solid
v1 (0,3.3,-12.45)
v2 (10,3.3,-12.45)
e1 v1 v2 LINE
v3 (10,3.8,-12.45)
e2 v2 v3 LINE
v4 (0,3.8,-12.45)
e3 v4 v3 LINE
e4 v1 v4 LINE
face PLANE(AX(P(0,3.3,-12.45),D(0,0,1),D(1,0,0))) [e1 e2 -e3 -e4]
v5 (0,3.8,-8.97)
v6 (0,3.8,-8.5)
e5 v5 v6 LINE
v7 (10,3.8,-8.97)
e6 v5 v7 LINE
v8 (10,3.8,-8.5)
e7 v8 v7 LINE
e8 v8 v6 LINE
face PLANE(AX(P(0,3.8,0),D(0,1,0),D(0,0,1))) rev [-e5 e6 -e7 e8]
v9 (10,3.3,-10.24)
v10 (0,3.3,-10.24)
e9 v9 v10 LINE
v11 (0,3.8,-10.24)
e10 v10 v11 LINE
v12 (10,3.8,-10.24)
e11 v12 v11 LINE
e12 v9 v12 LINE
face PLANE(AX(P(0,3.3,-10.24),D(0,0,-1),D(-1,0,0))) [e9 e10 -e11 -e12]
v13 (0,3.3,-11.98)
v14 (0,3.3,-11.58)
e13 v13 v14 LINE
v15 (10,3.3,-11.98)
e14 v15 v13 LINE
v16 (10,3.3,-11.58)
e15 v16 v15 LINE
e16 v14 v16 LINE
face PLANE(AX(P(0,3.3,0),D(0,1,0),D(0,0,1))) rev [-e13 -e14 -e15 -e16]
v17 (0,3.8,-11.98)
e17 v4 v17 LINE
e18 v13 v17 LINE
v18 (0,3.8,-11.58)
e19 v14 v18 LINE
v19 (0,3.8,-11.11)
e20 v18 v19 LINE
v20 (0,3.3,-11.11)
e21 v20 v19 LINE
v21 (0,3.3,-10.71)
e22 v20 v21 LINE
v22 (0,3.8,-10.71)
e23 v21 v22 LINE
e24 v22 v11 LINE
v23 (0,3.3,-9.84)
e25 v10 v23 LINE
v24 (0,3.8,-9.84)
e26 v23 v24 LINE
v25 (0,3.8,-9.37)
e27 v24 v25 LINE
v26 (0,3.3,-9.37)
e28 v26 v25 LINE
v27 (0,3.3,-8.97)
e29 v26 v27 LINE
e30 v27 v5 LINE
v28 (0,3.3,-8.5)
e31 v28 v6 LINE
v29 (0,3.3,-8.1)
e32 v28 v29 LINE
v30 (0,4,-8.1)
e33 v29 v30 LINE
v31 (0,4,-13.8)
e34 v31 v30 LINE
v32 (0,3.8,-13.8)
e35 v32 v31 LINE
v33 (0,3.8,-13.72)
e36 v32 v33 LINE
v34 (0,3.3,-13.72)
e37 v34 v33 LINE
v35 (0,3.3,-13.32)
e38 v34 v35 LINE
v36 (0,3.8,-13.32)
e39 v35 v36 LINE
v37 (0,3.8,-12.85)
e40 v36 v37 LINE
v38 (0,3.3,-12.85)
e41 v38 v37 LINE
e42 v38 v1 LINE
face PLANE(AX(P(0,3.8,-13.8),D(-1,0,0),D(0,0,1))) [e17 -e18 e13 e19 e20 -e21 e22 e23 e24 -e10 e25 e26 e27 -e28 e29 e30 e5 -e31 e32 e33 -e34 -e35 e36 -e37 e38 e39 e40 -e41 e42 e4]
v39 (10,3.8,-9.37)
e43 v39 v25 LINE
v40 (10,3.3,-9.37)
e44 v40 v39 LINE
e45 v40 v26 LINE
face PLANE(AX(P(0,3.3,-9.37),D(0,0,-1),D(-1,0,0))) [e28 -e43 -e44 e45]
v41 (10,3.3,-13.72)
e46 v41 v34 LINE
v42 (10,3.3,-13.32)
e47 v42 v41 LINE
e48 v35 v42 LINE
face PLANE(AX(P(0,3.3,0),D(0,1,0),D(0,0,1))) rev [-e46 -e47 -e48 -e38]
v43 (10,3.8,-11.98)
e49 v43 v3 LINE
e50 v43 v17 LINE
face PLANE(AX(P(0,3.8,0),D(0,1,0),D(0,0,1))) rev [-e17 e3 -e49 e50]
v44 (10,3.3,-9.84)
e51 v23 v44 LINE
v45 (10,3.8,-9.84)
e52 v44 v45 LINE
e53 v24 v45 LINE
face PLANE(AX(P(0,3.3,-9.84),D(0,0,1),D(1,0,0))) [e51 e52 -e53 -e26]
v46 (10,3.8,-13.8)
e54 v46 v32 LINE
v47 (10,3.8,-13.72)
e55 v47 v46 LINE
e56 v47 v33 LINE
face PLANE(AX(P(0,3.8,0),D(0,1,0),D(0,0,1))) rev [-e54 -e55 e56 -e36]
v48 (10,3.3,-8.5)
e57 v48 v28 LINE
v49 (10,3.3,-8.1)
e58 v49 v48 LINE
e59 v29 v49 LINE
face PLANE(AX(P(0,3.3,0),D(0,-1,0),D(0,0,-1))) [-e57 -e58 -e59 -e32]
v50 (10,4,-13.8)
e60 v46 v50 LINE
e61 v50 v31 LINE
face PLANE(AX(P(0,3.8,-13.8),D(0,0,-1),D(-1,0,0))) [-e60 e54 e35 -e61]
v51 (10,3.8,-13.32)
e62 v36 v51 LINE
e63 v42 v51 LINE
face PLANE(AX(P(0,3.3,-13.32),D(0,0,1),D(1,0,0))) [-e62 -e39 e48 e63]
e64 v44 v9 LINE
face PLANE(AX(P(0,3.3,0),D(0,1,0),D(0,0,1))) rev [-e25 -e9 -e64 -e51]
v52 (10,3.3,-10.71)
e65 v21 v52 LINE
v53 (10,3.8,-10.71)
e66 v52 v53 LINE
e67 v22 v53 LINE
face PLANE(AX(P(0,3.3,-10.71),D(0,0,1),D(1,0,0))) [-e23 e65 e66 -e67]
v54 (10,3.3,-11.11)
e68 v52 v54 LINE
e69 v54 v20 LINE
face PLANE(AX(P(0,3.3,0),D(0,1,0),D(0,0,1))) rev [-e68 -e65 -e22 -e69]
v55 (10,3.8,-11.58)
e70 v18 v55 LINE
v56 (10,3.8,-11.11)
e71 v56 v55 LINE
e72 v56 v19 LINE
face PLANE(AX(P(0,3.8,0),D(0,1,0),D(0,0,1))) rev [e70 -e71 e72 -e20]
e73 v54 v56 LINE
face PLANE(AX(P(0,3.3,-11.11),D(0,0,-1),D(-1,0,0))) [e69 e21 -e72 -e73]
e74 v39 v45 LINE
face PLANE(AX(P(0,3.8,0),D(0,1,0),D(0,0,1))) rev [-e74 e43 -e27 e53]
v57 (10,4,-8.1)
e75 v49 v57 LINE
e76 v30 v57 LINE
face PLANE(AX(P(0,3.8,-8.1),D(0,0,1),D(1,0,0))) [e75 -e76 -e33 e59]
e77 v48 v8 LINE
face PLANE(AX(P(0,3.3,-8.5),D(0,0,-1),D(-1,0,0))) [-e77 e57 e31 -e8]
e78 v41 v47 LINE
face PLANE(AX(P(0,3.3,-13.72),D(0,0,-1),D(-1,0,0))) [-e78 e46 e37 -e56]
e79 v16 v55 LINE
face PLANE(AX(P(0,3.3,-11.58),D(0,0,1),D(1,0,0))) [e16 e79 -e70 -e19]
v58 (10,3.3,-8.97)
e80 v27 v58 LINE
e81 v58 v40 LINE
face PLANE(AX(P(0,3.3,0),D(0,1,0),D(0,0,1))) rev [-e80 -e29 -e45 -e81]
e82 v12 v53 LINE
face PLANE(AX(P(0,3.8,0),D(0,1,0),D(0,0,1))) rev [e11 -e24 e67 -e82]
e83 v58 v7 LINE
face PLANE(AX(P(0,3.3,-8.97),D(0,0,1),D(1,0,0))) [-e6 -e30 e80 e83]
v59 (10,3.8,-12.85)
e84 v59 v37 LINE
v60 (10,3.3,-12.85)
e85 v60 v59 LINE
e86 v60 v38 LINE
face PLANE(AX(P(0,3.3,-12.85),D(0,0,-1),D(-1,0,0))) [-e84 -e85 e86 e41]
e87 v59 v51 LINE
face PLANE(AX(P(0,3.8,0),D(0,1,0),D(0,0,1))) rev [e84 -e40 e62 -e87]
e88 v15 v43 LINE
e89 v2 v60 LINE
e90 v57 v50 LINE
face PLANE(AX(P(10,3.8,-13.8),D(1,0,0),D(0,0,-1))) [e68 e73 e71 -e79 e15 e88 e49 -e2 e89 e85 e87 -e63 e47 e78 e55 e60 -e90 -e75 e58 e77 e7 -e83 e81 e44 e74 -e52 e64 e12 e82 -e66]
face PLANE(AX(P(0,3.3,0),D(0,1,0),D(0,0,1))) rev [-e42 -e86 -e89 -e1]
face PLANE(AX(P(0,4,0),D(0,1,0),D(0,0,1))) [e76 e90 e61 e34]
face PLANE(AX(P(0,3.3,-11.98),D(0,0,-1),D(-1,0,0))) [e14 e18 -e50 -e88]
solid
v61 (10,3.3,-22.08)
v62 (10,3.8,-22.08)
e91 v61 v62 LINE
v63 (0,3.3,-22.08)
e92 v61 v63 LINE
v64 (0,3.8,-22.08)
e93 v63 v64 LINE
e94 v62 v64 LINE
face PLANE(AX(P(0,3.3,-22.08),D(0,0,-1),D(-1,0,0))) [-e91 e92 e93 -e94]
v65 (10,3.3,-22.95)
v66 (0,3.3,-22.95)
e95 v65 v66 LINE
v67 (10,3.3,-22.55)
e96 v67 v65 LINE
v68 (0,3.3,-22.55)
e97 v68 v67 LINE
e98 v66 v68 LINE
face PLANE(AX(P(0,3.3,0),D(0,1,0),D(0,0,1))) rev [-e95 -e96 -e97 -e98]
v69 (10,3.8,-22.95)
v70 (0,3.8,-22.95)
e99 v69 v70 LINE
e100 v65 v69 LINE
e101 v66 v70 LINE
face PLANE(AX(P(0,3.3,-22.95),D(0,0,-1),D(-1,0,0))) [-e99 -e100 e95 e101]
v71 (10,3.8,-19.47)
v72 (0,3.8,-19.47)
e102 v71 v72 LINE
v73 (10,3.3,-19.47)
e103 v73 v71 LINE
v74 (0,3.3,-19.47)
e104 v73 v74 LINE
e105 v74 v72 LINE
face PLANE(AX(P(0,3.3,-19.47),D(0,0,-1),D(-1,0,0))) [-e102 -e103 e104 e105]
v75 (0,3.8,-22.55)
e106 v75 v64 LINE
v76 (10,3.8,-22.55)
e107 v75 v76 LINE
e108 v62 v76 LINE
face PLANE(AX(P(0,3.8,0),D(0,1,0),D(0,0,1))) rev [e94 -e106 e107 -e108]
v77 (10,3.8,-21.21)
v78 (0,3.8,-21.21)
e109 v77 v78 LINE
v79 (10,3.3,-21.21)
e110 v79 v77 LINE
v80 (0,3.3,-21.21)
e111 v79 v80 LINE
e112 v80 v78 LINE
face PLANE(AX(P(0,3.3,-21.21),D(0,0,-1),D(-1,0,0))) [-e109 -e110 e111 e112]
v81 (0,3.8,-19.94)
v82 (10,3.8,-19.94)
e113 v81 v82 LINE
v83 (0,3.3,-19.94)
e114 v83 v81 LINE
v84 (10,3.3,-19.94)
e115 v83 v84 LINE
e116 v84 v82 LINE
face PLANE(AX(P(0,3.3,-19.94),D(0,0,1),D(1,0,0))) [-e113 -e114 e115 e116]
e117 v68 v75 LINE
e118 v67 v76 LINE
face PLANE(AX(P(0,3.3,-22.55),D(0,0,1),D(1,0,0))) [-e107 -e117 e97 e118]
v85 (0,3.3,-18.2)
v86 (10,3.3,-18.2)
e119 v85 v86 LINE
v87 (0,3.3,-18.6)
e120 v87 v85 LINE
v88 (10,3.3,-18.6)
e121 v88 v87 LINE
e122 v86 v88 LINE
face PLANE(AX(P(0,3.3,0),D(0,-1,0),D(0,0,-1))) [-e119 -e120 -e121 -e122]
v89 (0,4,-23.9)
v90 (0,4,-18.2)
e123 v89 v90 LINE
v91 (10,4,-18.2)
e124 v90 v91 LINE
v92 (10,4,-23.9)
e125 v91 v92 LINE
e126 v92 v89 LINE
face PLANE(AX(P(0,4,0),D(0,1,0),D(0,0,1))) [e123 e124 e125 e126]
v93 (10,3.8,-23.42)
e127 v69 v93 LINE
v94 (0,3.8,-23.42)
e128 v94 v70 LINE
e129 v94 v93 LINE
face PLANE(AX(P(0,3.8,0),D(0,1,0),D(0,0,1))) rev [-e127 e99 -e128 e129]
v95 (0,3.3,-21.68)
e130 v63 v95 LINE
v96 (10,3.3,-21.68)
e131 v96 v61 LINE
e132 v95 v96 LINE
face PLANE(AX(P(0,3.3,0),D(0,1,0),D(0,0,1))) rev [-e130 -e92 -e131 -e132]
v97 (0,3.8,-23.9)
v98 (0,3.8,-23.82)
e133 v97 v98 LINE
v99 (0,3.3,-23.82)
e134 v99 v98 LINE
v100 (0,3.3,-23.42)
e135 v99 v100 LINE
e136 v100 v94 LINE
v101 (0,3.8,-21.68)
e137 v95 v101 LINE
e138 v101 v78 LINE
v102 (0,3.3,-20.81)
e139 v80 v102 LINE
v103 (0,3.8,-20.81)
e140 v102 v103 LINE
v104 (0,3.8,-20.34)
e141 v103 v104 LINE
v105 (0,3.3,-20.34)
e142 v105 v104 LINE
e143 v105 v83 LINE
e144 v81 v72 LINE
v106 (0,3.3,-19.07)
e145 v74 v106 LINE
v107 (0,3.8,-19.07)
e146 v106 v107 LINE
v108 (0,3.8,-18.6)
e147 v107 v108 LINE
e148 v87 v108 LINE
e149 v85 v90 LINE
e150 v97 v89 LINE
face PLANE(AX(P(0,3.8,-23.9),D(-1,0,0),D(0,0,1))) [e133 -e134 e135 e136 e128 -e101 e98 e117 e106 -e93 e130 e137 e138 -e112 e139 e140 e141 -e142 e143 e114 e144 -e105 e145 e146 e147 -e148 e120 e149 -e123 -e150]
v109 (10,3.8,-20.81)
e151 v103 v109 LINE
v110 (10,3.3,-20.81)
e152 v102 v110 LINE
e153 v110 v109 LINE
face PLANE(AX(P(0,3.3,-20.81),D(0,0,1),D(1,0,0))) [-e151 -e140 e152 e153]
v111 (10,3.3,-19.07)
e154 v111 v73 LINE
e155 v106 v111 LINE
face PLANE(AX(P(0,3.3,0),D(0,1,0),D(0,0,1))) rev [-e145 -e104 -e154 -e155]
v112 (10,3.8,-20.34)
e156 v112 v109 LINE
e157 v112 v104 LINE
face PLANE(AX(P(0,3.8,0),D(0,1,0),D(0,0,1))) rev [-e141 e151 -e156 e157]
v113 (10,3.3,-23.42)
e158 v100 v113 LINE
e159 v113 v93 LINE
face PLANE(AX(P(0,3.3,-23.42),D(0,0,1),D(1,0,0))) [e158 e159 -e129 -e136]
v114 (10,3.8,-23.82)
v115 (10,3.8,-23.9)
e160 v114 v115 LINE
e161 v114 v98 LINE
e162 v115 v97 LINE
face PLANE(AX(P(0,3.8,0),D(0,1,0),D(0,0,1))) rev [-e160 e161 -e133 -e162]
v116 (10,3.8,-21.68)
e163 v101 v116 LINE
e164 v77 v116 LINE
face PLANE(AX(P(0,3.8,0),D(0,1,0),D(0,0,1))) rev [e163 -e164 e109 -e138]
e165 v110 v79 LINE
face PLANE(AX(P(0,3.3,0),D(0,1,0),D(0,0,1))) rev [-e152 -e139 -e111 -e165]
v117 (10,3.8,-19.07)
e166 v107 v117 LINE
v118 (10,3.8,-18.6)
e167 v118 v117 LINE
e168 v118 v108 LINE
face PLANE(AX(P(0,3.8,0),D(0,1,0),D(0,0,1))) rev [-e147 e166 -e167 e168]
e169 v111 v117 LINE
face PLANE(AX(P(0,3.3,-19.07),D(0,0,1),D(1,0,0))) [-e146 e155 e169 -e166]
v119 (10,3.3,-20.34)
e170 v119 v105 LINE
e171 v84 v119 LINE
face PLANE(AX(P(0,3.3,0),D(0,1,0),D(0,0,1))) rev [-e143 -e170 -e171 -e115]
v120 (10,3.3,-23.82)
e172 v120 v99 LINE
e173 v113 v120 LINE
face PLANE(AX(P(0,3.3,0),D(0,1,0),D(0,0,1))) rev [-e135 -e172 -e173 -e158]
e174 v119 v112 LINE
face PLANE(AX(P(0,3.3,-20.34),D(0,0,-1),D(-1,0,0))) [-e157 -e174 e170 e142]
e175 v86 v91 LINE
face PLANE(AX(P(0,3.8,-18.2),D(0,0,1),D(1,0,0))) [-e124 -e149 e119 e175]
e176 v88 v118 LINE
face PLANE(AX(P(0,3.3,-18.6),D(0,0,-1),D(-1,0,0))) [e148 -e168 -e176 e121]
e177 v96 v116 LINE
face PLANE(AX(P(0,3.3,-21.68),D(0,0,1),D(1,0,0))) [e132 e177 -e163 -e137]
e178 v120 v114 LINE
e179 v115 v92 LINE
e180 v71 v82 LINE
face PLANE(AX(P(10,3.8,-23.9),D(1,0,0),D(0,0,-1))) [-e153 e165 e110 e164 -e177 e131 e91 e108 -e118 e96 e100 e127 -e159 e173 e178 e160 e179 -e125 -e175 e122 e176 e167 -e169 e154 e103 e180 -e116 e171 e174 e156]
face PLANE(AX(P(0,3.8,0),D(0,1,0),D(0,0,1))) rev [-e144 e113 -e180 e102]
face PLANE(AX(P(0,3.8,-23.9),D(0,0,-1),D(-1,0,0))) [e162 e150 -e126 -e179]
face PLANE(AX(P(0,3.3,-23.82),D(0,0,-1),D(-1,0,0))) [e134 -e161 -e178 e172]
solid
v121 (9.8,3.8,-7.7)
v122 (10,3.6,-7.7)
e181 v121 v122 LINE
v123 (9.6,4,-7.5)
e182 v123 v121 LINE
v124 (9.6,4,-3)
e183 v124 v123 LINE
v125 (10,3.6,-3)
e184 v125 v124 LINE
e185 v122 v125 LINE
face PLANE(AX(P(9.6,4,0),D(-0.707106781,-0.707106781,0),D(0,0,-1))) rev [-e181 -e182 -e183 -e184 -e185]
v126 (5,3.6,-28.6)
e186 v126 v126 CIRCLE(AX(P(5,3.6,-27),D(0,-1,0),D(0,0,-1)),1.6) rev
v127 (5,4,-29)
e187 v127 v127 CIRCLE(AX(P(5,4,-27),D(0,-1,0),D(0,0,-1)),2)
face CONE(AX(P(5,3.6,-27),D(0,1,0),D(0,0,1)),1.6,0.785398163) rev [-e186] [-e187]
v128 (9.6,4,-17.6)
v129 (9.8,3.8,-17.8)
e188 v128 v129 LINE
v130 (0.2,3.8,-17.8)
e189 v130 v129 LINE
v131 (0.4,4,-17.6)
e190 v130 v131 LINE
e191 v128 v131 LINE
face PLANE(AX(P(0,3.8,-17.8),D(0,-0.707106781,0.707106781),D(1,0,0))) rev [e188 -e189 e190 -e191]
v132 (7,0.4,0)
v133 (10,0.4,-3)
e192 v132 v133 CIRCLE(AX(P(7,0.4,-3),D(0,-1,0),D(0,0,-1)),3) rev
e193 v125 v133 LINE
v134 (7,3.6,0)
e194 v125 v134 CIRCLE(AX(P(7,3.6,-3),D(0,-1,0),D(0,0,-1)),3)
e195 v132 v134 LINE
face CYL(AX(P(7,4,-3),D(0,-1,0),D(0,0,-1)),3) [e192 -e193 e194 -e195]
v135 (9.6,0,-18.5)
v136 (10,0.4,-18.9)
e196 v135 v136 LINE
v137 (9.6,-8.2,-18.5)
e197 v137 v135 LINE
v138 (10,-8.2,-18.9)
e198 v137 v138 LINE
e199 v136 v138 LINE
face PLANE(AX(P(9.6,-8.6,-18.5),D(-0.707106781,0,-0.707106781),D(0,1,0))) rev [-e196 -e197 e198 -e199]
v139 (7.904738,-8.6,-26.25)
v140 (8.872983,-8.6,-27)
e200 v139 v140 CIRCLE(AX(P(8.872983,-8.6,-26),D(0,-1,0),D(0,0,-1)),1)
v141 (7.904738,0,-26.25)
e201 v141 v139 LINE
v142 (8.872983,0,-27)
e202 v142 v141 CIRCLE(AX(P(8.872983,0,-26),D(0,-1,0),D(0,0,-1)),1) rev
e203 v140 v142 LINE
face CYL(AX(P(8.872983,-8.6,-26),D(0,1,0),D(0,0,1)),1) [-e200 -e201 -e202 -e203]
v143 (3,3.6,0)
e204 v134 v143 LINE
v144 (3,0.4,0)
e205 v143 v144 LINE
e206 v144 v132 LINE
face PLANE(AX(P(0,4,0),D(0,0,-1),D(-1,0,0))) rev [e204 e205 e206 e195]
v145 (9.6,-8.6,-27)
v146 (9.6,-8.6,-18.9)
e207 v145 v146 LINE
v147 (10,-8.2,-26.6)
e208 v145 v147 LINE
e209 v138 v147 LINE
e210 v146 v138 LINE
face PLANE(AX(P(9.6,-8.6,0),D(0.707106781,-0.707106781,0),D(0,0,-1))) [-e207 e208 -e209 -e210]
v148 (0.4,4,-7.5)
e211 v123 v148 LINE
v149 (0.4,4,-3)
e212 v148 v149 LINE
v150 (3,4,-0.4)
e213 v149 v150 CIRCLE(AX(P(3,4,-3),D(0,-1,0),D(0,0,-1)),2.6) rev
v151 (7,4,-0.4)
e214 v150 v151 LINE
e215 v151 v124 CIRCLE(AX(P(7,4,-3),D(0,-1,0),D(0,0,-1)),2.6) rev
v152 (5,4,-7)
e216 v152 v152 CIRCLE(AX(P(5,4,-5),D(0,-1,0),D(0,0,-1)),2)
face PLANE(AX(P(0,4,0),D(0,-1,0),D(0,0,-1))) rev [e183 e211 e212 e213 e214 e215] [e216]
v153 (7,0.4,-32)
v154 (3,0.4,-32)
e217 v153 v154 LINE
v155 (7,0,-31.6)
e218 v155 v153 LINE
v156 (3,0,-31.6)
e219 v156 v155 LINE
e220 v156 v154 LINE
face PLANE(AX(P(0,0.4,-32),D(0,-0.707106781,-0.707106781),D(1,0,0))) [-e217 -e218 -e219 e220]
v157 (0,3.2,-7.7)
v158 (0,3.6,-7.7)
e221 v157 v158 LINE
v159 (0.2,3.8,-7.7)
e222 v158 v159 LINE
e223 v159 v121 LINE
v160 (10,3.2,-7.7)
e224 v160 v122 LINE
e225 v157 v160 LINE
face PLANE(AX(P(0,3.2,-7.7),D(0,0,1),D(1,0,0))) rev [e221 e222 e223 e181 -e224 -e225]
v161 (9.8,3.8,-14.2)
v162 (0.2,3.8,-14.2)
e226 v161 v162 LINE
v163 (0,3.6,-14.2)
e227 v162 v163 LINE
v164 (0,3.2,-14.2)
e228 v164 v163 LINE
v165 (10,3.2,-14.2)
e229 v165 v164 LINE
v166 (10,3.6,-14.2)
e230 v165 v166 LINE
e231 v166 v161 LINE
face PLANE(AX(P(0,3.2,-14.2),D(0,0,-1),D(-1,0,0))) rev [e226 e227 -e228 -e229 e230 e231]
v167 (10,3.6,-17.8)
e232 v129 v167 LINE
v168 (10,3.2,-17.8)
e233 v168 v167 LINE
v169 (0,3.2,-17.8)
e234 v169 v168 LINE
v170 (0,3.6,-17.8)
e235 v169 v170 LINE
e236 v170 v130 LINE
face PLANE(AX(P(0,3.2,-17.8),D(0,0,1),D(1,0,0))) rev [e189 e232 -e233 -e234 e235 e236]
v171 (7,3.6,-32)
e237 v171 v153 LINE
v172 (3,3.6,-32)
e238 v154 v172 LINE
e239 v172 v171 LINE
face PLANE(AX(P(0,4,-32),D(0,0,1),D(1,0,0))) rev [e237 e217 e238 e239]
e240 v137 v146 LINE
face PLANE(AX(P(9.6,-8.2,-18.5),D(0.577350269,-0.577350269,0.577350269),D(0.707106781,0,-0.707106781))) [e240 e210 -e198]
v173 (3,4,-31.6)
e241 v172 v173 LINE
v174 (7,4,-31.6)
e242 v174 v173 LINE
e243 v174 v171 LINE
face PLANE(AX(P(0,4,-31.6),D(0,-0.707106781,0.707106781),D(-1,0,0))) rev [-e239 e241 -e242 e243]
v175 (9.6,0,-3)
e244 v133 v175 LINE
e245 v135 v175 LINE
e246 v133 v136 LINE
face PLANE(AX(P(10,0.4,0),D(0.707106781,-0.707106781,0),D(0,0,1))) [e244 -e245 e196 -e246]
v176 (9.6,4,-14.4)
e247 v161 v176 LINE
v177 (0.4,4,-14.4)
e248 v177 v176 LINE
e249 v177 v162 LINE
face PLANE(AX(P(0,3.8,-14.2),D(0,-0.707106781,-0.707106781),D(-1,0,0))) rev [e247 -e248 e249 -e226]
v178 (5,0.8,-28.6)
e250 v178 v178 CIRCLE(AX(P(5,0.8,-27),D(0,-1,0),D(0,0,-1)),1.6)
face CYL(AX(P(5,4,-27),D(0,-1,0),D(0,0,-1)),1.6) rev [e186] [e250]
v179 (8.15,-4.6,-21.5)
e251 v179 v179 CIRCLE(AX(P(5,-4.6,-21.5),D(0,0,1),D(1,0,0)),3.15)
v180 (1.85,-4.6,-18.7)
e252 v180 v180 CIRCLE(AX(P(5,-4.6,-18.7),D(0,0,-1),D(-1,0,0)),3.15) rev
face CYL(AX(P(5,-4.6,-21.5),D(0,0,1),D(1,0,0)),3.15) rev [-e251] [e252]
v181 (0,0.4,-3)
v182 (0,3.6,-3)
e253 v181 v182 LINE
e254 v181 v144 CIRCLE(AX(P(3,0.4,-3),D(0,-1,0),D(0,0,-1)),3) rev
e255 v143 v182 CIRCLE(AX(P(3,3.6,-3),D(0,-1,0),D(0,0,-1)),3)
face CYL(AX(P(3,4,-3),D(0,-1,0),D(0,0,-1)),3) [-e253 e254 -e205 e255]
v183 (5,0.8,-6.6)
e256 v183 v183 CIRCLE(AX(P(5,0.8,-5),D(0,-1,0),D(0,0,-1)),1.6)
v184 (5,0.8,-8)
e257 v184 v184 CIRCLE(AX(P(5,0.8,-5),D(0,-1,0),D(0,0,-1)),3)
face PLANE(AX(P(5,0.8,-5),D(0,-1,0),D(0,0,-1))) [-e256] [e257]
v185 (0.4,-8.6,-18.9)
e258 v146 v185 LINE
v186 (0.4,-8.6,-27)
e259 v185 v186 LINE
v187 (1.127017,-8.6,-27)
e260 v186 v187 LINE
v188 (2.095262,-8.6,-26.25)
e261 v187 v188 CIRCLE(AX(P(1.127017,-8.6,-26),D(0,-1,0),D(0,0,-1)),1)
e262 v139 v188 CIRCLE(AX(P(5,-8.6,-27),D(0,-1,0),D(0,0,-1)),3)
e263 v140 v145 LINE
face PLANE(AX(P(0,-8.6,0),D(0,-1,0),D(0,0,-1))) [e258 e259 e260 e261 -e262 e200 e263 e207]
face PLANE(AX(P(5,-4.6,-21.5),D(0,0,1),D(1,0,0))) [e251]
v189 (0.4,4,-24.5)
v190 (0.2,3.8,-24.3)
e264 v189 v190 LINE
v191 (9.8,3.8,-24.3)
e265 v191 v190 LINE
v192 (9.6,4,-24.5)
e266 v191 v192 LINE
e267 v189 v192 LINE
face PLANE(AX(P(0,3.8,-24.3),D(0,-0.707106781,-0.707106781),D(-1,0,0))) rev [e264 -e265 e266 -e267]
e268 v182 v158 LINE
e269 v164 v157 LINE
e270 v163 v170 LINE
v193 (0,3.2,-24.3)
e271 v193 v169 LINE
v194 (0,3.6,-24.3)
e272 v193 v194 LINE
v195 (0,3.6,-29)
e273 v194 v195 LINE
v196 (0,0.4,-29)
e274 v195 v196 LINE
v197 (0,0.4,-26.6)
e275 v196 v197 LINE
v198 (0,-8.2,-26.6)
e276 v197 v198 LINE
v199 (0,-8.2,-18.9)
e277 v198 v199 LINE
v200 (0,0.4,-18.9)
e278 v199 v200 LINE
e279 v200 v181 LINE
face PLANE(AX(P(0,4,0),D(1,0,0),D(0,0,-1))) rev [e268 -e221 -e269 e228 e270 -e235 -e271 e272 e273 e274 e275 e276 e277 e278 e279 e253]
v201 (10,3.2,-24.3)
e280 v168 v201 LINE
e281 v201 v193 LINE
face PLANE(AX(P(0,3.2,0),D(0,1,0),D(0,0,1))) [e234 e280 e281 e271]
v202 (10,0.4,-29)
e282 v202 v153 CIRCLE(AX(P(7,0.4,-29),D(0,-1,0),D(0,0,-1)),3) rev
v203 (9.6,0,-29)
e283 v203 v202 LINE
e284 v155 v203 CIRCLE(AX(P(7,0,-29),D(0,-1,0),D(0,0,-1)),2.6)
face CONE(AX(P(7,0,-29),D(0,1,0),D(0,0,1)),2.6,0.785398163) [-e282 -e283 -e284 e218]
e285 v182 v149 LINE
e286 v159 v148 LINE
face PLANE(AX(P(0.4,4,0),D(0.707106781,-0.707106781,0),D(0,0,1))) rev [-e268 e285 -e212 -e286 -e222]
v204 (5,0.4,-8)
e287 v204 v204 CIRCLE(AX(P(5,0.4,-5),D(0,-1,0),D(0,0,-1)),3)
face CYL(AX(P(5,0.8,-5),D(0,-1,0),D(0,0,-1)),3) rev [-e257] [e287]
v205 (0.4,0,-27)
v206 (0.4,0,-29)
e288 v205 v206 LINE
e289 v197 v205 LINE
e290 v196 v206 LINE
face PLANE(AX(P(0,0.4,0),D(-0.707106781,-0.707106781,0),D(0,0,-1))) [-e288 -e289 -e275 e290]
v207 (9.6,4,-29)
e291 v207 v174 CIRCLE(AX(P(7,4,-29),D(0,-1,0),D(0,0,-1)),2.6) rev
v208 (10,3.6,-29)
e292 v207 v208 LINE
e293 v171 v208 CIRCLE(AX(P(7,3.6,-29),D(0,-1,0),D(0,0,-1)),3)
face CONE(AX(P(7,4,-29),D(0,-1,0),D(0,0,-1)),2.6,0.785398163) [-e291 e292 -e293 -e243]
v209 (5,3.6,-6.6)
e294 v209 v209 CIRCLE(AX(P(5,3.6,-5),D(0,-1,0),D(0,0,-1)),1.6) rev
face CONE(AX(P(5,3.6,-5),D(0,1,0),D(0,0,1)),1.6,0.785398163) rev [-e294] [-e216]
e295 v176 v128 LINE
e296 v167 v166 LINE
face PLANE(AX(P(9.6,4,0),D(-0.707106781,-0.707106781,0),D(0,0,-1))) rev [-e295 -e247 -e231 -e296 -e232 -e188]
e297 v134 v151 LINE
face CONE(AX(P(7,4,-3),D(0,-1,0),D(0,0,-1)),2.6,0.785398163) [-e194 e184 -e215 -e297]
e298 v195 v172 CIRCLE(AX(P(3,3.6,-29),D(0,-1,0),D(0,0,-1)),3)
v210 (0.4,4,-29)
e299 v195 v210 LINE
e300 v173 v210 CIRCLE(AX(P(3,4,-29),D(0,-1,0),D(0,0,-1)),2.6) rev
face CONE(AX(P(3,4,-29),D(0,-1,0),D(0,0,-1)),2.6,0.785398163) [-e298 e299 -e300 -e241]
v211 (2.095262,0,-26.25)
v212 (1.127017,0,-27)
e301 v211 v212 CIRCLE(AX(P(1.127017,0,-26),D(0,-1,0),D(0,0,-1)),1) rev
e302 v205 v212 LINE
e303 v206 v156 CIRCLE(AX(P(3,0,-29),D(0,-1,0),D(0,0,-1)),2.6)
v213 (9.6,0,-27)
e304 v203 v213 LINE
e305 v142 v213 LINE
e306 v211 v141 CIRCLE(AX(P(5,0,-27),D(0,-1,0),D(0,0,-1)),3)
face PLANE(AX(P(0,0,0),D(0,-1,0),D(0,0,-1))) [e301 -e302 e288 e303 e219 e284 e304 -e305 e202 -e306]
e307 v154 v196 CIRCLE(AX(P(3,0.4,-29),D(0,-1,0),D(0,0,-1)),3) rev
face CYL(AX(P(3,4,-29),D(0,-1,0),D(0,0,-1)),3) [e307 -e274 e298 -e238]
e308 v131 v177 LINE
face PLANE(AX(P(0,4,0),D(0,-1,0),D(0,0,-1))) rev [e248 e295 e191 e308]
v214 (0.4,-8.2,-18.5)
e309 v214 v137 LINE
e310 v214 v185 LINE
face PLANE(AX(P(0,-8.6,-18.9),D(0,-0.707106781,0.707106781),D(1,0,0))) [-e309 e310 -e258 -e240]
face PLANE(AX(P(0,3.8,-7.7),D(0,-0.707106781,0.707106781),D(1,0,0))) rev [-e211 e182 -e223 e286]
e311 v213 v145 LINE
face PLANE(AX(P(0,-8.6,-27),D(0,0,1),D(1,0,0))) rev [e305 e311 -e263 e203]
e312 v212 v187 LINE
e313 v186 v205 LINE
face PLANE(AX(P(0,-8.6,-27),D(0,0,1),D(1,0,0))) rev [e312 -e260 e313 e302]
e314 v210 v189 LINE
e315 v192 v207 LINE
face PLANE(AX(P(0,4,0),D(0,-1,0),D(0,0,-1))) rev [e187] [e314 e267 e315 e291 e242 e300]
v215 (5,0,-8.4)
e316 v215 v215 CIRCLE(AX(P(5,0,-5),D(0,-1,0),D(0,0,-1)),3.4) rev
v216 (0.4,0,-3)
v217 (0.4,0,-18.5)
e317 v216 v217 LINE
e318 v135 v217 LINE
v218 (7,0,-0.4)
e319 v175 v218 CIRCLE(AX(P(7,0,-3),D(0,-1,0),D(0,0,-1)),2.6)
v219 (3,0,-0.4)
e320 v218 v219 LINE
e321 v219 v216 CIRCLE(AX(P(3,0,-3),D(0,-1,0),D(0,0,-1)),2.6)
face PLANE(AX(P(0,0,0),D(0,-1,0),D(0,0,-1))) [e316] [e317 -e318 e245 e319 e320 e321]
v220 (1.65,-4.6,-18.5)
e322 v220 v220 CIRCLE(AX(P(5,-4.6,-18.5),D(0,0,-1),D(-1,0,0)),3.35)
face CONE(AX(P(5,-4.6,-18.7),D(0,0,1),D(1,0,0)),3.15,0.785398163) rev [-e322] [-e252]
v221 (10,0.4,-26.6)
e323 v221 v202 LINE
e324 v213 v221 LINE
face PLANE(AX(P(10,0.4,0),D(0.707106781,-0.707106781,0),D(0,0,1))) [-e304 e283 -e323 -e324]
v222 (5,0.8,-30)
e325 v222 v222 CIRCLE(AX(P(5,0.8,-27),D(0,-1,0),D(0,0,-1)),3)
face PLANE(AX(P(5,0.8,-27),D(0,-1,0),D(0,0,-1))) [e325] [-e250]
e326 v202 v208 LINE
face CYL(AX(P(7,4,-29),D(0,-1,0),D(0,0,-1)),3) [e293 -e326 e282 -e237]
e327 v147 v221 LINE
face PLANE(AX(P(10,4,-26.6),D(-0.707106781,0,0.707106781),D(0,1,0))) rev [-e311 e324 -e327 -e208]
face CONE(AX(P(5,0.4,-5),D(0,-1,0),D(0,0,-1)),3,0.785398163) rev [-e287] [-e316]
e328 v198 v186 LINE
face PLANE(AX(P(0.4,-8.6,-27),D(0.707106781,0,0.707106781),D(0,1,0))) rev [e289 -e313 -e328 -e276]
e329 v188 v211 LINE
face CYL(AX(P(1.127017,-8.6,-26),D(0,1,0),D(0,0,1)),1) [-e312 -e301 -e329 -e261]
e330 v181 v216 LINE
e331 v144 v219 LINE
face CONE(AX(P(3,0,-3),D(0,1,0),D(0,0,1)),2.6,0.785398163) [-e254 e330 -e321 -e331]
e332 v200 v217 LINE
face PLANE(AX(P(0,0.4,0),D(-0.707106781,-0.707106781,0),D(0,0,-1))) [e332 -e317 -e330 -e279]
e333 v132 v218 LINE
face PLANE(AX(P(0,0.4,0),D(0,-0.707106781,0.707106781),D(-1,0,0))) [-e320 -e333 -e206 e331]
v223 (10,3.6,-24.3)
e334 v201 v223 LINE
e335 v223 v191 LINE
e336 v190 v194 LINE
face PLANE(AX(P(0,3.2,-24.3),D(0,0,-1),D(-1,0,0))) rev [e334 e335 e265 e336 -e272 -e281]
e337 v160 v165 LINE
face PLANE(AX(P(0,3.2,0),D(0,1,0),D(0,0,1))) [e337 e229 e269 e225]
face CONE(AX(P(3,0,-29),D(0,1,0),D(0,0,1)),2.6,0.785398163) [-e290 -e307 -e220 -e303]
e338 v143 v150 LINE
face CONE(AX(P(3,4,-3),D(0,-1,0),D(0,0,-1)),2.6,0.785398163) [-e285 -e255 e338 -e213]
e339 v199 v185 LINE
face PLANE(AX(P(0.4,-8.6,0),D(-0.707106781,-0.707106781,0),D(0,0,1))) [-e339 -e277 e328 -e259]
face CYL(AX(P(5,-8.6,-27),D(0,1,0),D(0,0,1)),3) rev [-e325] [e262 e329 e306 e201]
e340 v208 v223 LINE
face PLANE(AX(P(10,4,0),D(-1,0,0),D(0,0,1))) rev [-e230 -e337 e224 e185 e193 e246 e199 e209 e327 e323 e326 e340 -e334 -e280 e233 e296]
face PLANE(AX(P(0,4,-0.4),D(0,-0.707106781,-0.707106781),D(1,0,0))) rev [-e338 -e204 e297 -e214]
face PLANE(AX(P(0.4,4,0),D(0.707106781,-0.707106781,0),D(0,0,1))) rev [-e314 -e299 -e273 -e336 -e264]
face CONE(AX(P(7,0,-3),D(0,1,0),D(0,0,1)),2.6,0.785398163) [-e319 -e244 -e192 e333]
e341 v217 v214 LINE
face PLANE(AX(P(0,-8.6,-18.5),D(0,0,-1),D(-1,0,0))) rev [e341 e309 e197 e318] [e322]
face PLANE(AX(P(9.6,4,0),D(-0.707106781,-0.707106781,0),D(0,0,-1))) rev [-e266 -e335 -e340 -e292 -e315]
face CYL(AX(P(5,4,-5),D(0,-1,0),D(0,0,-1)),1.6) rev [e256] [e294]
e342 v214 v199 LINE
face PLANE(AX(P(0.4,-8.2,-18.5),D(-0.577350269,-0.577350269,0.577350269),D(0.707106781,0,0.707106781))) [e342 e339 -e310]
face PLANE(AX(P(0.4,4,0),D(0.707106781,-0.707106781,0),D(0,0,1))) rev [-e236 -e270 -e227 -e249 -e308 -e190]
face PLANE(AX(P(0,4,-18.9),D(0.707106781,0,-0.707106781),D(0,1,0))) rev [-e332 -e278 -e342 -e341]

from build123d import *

# Parameters (mm, degrees)
SKETCH_1_W          = 10
SKETCH_1_H          = 32
SKETCH_1_R          = 1.6
EXTRUDE_1_DEPTH     = 4
SKETCH_2_W          = 10
SKETCH_2_H          = 8.5
EXTRUDE_2_DEPTH     = 8.6
SKETCH_3_R          = 3.15
CUT_EXTRUDE_1_DEPTH = 3
SKETCH_4_R          = 3
CUT_EXTRUDE_2_DEPTH = 35.611558763
SKETCH_5_W          = 10
SKETCH_5_H          = 6.5
CUT_EXTRUDE_3_DEPTH = 0.8
SKETCH_6_W          = 10
SKETCH_6_H          = 5.7
EXTRUDE_3_DEPTH     = 0.2
EXTRUDE_3_2_DEPTH   = 0.2
SKETCH_7_W          = 10
SKETCH_7_H          = 0.4
EXTRUDE_4_DEPTH     = 0.7
CUT_EXTRUDE_START   = -0.8
SKETCH_8_R          = 3
CUT_EXTRUDE_4_DEPTH = 0.8
FILLET_1_R          = 3
FILLET_3_R          = 1
CHAMFER_1_SIZE      = 0.2
CHAMFER_4_SIZE      = 0.4
CHAMFER_6_SIZE      = 0.2


with BuildPart() as part:
    # 草图1 → 凸台-拉伸1 (new body)
    with BuildSketch(Plane(origin=(0, 0, 0), x_dir=(1, 0, 0), z_dir=(0, 1, 0))):
        with Locations((5, 16)):
            Rectangle(SKETCH_1_W, SKETCH_1_H)
        with Locations(Location((5, 27, 0), (0, 0, 270))):
            Circle(SKETCH_1_R, mode=Mode.SUBTRACT)
        with Locations(Location((5, 5, 0), (0, 0, 270))):
            Circle(SKETCH_1_R, mode=Mode.SUBTRACT)
    extrude(amount=EXTRUDE_1_DEPTH)

    # 草图2 → 凸台-拉伸2 (add)
    with BuildSketch(Plane(origin=(0, 0, 0), x_dir=(-1, 0, 0), z_dir=(0, -1, 0))):
        with Locations((-5, 22.75)):
            Rectangle(SKETCH_2_W, SKETCH_2_H)
    extrude(amount=EXTRUDE_2_DEPTH)

    # 草图3 → 切除-拉伸1 (cut)
    with BuildSketch(Plane.XY.offset(-18.5)):
        with Locations((5, -4.6)):
            Circle(SKETCH_3_R)
    extrude(amount=-CUT_EXTRUDE_1_DEPTH, mode=Mode.SUBTRACT)

    # 草图4 → 切除-拉伸2 (cut, through all)
    with BuildSketch(Plane(origin=(0, 0, 0), x_dir=(-1, 0, 0), z_dir=(0, -1, 0))):
        with Locations((-5, 27)):
            Circle(SKETCH_4_R)
    extrude(amount=CUT_EXTRUDE_2_DEPTH, mode=Mode.SUBTRACT)

    # 草图5 → 切除-拉伸3 (cut)
    with BuildSketch(Plane(origin=(0, 4, 0), x_dir=(1, 0, 0), z_dir=(0, 1, 0))):
        with Locations((5, 21.05)):
            Rectangle(SKETCH_5_W, SKETCH_5_H)
        with Locations((5, 10.95)):
            Rectangle(SKETCH_5_W, SKETCH_5_H)
    extrude(amount=-CUT_EXTRUDE_3_DEPTH, mode=Mode.SUBTRACT)

    # 草图8 → 切除-拉伸4 (cut)
    with BuildSketch(Plane(origin=(0, 0, 0), x_dir=(-1, 0, 0), z_dir=(0, -1, 0)).offset(CUT_EXTRUDE_START)):
        with Locations(Location((-5, 5, 0), (0, 0, 90))):
            Circle(SKETCH_8_R)
        with Locations((-5, 27)):
            Circle(SKETCH_8_R)
    extrude(amount=CUT_EXTRUDE_4_DEPTH, mode=Mode.SUBTRACT)

    # 圆角1
    fillet_1_edges = [part.edges().sort_by_distance(p)[0] for p in [
        (0, 2, -32),
        (10, 2, -32),
        (10, 2, 0),
        (0, 2, 0),
    ]]
    fillet(fillet_1_edges, radius=FILLET_1_R)

    # 圆角3
    # the kernel refuses this fillet: 1 mm, written as the material it takes off along each edge
    with BuildSketch(Plane(origin=(8, -10.782458366, -27), x_dir=(1, 0, 0), z_dir=(0, 1, 0)), Plane(origin=(2, 0, -27), x_dir=(-1, 0, 0), z_dir=(0, -1, 0))) as fillet_3_piece_1:
        with BuildLine():
            CenterArc((0.872983346, -1), FILLET_3_R, 90, 75.522487814)
            ThreePointArc((-0.09526249, -0.75), (-0.023910911, -0.378012877), (0, 0))
            Line((0, 0), (0.872983346, 0))
        make_face()
    extrude(amount=10.782458366, mode=Mode.SUBTRACT)

    # 倒角1
    chamfer_1_edges = [part.edges().sort_by_distance(p)[0] for p in [
        (5, 4, -17.8),
        (5, 4, -24.3),
        (5, 4, -7.7),
        (5, 4, -14.2),
    ]]
    chamfer(chamfer_1_edges, length=CHAMFER_1_SIZE)

    # 倒角4
    chamfer_4_edges = [part.edges().sort_by_distance(p)[0] for p in [
        (10, 4, -26.75),
        (0, 4, -26.75),
        (10, 4, -16),
        (0, 4, -16),
        (5, 4, -6.6),
        (0, 4, -5.25),
        (10, 4, -5.25),
        (0.878679656, 4, -0.878679656),
        (9.121320344, 4, -0.878679656),
        (5, 4, 0),
        (5, 4, -28.6),
        (5, 0, -2),
        (10, 0, -10.75),
        (9.121320344, 0, -0.878679656),
        (5, 0, 0),
        (0.878679656, 0, -0.878679656),
        (10, -4.3, -27),
        (0, 0, -10.75),
        (10, -4.3, -18.5),
        (10, -8.6, -22.75),
        (5, -8.6, -18.5),
        (0, -4.3, -18.5),
        (0, -8.6, -22.75),
        (0, -4.3, -27),
        (0, 0, -28),
        (10, 0, -28),
        (5, 0, -32),
        (5, 4, -32),
        (9.121320344, 0, -31.121320344),
        (0.878679656, 0, -31.121320344),
        (9.121320344, 4, -31.121320344),
        (0.878679656, 4, -31.121320344),
    ]]
    chamfer(chamfer_4_edges, length=CHAMFER_4_SIZE)

    # 倒角6
    chamfer_6_edges = [part.edges().sort_by_distance(p)[0] for p in [
        (1.85, -4.6, -18.5),
    ]]
    chamfer(chamfer_6_edges, length=CHAMFER_6_SIZE)


with BuildPart() as body_2:
    # 草图6 → 凸台-拉伸3 (new body)
    with BuildSketch(Plane(origin=(0, 4, 0), x_dir=(1, 0, 0), z_dir=(0, 1, 0))):
        with Locations((5, 10.95)):
            Rectangle(SKETCH_6_W, SKETCH_6_H)
    extrude(amount=-EXTRUDE_3_DEPTH)



with BuildPart() as body_3:
    # 草图6 → Extrude 3 2 (new body)
    with BuildSketch(Plane(origin=(0, 4, 0), x_dir=(1, 0, 0), z_dir=(0, 1, 0))):
        with Locations((5, 21.05)):
            Rectangle(SKETCH_6_W, SKETCH_6_H)
    extrude(amount=-EXTRUDE_3_2_DEPTH)


with BuildPart() as body_2_1:
    add(body_2.part)

    add(body_3.part)  # 凸台-拉伸4 merges body 3
    # 草图7 → 凸台-拉伸4 (add)
    with BuildSketch(Plane(origin=(0, 4, 0), x_dir=(1, 0, 0), z_dir=(0, 1, 0))):
        with Locations((5, 8.3)):
            Rectangle(SKETCH_7_W, SKETCH_7_H)
        with Locations((5, 18.4)):
            Rectangle(SKETCH_7_W, SKETCH_7_H)
        with Locations((5, 19.27)):
            Rectangle(SKETCH_7_W, SKETCH_7_H)
        with Locations((5, 9.17)):
            Rectangle(SKETCH_7_W, SKETCH_7_H)
        with Locations((5, 20.14)):
            Rectangle(SKETCH_7_W, SKETCH_7_H)
        with Locations((5, 10.04)):
            Rectangle(SKETCH_7_W, SKETCH_7_H)
        with Locations((5, 21.01)):
            Rectangle(SKETCH_7_W, SKETCH_7_H)
        with Locations((5, 10.91)):
            Rectangle(SKETCH_7_W, SKETCH_7_H)
        with Locations((5, 21.88)):
            Rectangle(SKETCH_7_W, SKETCH_7_H)
        with Locations((5, 11.78)):
            Rectangle(SKETCH_7_W, SKETCH_7_H)
        with Locations((5, 22.75)):
            Rectangle(SKETCH_7_W, SKETCH_7_H)
        with Locations((5, 12.65)):
            Rectangle(SKETCH_7_W, SKETCH_7_H)
        with Locations((5, 23.62)):
            Rectangle(SKETCH_7_W, SKETCH_7_H)
        with Locations((5, 13.52)):
            Rectangle(SKETCH_7_W, SKETCH_7_H)
    extrude(amount=-EXTRUDE_4_DEPTH)


solid = Compound([part.part, body_2_1.part])
